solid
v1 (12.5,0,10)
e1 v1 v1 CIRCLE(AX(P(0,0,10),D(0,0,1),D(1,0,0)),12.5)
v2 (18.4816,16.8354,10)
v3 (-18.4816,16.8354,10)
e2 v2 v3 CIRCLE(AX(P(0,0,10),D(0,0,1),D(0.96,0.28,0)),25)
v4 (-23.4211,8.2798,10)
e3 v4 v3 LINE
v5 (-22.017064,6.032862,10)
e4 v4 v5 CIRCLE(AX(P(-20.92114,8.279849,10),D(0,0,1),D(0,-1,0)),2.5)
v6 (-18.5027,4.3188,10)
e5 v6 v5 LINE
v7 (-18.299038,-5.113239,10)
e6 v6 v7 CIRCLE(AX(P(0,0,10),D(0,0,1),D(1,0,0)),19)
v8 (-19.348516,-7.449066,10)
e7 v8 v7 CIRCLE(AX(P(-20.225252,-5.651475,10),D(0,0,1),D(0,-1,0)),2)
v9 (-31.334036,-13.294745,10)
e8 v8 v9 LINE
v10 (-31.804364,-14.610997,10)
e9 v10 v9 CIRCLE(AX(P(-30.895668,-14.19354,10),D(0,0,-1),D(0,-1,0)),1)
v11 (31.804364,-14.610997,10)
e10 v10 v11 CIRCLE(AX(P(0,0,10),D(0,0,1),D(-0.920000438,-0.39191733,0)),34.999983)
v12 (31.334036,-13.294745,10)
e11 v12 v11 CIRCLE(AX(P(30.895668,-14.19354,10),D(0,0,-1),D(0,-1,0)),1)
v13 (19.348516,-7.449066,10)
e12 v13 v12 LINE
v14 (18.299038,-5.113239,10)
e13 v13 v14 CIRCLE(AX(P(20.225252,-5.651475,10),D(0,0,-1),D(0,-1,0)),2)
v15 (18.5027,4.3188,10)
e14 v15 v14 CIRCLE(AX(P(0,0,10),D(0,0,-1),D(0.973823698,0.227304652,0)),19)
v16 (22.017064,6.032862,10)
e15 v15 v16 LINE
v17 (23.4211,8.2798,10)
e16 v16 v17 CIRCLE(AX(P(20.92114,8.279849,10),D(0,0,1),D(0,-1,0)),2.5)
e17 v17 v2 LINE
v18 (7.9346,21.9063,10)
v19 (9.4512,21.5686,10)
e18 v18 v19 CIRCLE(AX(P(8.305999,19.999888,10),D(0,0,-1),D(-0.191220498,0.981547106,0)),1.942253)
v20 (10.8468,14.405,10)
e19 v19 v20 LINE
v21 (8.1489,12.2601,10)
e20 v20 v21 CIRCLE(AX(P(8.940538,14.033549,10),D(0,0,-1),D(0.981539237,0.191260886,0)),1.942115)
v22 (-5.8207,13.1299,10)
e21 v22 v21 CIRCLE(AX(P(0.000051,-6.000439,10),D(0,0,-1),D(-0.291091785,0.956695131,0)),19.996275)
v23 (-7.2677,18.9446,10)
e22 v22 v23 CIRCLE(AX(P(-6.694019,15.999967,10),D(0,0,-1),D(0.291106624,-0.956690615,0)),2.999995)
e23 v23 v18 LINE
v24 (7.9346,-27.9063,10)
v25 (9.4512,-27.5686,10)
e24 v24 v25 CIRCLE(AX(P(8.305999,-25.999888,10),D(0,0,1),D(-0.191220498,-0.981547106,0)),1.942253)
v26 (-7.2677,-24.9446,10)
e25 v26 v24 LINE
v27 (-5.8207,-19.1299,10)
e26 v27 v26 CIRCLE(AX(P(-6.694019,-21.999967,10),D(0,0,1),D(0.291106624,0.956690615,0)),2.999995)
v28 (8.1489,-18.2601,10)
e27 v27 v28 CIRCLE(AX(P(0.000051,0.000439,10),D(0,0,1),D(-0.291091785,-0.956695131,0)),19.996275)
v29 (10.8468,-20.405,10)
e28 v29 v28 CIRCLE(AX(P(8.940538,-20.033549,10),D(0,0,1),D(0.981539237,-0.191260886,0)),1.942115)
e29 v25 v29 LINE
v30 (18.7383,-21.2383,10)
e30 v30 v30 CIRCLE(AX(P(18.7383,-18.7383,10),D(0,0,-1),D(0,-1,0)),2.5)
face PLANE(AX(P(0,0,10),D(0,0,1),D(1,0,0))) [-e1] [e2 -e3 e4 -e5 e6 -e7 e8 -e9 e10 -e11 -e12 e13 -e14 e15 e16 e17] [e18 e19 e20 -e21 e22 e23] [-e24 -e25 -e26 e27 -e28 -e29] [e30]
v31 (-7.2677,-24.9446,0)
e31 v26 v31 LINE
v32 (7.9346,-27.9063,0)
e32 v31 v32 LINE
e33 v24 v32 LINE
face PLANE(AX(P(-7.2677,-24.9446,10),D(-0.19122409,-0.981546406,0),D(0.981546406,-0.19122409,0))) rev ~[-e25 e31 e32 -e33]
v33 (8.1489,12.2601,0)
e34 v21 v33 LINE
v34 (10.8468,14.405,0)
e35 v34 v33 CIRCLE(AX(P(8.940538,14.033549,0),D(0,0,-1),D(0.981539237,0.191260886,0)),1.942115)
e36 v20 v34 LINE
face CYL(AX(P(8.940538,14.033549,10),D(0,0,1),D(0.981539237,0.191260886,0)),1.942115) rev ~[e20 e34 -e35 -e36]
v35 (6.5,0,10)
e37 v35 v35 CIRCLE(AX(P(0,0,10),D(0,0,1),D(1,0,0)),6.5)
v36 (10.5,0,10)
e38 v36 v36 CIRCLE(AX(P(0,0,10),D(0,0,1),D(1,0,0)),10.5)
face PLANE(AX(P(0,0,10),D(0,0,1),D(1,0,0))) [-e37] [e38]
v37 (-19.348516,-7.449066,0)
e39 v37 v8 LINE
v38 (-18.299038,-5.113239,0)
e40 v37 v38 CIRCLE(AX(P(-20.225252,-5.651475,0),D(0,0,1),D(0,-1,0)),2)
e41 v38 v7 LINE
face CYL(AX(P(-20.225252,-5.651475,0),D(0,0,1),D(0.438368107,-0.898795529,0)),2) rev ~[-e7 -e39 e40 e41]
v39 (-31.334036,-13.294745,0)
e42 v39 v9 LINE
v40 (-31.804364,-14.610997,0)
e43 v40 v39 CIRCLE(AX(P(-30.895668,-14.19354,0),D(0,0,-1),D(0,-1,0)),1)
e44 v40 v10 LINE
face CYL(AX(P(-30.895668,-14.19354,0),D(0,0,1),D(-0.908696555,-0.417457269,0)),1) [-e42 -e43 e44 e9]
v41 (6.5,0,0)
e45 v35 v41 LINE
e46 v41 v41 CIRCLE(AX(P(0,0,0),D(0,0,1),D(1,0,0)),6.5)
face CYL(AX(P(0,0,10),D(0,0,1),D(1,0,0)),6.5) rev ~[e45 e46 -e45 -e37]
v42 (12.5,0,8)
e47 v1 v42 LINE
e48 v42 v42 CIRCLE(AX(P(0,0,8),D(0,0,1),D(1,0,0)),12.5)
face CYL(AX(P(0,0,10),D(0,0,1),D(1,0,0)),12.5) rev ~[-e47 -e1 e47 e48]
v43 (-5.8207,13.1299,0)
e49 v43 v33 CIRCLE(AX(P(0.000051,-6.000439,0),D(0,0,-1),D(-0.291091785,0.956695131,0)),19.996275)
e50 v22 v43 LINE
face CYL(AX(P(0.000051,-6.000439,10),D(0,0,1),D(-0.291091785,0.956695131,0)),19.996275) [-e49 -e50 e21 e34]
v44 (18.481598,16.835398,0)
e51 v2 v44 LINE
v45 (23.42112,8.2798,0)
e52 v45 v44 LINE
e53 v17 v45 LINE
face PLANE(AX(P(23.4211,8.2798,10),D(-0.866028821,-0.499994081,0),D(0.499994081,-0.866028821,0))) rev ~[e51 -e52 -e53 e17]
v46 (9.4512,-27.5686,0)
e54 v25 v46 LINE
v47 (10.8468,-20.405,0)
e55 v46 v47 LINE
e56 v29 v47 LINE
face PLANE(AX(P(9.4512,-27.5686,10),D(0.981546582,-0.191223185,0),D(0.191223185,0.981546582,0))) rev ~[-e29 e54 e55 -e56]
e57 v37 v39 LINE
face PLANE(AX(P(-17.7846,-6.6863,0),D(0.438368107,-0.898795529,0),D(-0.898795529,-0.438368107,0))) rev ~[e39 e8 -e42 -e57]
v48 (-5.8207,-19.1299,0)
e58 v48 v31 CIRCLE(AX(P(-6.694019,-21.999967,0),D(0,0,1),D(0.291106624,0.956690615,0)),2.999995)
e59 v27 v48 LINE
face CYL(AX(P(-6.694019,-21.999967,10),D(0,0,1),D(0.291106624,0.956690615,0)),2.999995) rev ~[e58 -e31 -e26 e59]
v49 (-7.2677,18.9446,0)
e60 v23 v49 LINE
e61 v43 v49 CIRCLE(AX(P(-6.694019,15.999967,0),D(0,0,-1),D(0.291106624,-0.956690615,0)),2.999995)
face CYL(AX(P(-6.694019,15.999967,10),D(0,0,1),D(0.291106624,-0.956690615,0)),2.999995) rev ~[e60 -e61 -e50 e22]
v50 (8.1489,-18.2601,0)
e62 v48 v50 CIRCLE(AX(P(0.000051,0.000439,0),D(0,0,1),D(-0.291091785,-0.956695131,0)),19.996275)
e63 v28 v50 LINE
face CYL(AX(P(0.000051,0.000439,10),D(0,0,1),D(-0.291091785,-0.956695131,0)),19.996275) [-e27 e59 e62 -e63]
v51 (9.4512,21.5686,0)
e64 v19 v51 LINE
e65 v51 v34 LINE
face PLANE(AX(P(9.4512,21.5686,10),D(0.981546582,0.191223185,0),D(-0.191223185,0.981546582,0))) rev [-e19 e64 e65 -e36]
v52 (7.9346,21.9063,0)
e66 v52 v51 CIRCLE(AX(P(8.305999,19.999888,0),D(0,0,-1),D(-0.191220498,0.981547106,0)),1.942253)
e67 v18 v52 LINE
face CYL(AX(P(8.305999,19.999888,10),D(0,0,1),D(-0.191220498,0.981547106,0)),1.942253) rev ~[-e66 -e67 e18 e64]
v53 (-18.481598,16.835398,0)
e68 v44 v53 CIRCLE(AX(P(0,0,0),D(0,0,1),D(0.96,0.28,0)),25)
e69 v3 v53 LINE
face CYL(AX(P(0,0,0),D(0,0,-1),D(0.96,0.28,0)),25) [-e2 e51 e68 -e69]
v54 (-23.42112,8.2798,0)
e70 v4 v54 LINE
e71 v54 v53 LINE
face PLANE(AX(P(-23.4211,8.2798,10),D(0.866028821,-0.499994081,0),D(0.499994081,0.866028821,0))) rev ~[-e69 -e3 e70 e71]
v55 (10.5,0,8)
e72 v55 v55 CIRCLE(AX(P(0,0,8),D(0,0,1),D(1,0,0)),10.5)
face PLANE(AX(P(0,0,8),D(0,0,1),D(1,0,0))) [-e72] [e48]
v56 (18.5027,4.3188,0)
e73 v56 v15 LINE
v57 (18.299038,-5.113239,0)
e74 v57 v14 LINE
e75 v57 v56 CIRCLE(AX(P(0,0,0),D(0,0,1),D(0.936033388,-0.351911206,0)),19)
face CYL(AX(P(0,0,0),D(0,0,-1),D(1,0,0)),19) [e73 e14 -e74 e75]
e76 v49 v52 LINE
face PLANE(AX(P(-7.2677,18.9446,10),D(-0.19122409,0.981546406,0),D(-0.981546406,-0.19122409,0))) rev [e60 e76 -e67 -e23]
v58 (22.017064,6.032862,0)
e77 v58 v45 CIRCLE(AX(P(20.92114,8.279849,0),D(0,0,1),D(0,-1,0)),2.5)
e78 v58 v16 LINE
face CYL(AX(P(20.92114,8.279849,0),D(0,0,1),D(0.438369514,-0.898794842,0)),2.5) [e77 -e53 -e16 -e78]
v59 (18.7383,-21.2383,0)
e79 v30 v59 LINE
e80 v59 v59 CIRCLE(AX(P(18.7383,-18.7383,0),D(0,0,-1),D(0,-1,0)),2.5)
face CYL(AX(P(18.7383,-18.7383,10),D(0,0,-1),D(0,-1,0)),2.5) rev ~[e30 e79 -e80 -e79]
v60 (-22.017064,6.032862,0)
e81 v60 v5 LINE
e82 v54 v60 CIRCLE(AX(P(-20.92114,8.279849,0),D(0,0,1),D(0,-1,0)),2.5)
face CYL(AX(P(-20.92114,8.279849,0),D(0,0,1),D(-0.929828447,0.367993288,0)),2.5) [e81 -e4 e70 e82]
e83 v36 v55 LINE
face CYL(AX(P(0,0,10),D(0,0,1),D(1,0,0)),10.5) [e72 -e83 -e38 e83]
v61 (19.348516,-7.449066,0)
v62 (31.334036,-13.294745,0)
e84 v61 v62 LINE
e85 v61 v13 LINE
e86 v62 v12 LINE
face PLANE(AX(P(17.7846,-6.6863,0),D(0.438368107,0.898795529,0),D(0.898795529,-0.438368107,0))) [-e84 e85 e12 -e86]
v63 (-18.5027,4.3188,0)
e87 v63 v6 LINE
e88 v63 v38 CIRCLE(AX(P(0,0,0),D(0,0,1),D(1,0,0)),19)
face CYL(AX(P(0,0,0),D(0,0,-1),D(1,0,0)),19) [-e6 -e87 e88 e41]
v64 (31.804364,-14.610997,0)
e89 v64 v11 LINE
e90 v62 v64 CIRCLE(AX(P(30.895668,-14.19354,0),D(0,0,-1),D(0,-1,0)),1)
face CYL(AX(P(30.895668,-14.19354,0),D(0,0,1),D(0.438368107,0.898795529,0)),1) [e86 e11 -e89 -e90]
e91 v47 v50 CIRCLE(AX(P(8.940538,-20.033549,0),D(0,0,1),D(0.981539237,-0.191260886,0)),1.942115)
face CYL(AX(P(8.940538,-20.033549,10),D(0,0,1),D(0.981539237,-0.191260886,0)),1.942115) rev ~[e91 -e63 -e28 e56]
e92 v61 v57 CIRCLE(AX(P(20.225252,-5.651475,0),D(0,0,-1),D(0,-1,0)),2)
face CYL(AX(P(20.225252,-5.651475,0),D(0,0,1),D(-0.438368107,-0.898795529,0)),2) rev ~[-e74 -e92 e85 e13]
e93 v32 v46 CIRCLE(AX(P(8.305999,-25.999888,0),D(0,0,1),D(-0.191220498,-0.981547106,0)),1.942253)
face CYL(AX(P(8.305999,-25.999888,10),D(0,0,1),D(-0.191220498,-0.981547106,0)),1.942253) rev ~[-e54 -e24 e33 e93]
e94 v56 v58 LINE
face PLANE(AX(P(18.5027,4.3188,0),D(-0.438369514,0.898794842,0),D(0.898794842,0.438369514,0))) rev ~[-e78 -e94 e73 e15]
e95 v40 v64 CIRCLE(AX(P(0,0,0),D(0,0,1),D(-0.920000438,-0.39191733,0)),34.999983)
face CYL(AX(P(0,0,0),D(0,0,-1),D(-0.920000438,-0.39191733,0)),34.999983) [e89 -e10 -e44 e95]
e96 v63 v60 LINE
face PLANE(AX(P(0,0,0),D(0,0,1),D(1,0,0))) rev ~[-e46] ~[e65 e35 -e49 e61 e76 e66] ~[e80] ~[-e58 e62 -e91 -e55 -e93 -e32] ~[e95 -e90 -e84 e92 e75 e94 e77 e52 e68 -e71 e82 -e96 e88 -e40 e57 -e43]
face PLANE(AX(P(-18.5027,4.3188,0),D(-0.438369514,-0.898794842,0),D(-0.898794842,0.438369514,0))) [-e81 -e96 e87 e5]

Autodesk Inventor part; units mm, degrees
ref_plane "XY Plane" through (0, 0, 0) normal (0, 0, 1) x (1, 0, 0)
sketch "Skizze1" plane through (0, 0, 0) normal (0, 0, 1) x (1, 0, 0)
  line L0 (0, 25) -> (0, -35) construction
  line L1 (-32.2, 0) -> (32.2, 0) construction
  circle A0 centre (0, 0) radius 19
  line L2 (-18.5027, 4.3188) -> (-24, 7)
  line L3 (-17.7846, -6.6863) -> (-32.2, -13.7171)
  line L4 (18.5027, 4.3188) -> (24, 7)
  line L5 (17.7846, -6.6863) -> (32.2, -13.7171)
  arc A1 (-32.2, -13.7171) -> (32.2, -13.7171) centre (0, 0) ccw
  arc A2 (24, 7) -> (-24, 7) centre (0, 0) ccw
  dimension "d3" = 38
  dimension "d4" = 26
  dimension "d5" = 52
  dimension "d6" = 26
  dimension "d7" = 52
  dimension "d8" = 48
  dimension "d9" = 64.4
  dimension "d10" = 60
  dimension "d11" = 25
extrude "Extrusion1" add sketch "Skizze1" along normal blind 10
fillet "Rundung1" radius 2.5 2 edges at (24, 7, 5) (-24, 7, 5)
sketch "Skizze2" plane through (0, 0, 10) normal (0, 0, 1) x (1, 0, 0)
  line L0 (0, 0) -> (24.7487, -24.7487) construction
  arc A0 (-32.2, -13.7171) -> (32.2, -13.7171) centre (0, 0) ccw projected
  line L1 (0, 0) -> (35, 0) construction
  point P0 (18.7383, -18.7383)
  dimension "d15" = 45
  dimension "d16" = 26.5
hole "Bohrung1" at (18.7383, -18.7383, 10) direction (0, 0, -1) diameter 5 end through all
fillet "Rundung2" radius 1 2 edges at (32.2, -13.7171, 5) (-32.2, -13.7171, 5)
fillet "Rundung3" radius 2 2 edges at (17.7846, -6.6863, 5) (-17.7846, -6.6863, 5)
sketch "Skizze3" plane through (0, 0, 10) normal (0, 0, 1) x (1, 0, 0)
  arc A0 (-23.2457, 9.1998) -> (-22.0171, 6.0329) centre (-20.9211, 8.2798) ccw projected
  line L0 (-23.4211, 8.2798) -> (-23.4211, 29.6928) construction
  line L1 (-23.4211, 8.2798) -> (-18.4816, 16.8354)
  line L2 (-23.4211, 8.2798) -> (-11.3111, 8.2798) construction
  arc A1 (23.2457, 9.1998) -> (-23.2457, 9.1998) centre (0, 0) ccw projected
  dimension "d27" = 30
extrude "Extrusion2" cut sketch "Skizze3" against normal through all
ref_plane "Arbeitsebene1" through (0, 0, 0) normal (1, 0, 0) x (0, 1, 0)
mirror "Spiegeln1" about plane through (0, 0, 0) normal (1, 0, 0) of "Extrusion2"
sketch "Skizze4" plane through (0, 0, 10) normal (0, 0, 1) x (1, 0, 0)
  circle A0 centre (0, 0) radius 6.5
  dimension "d31" = 13
extrude "Extrusion3" cut sketch "Skizze4" against normal blind 10
sketch "Skizze5" plane through (0, 0, 10) normal (0, 0, 1) x (1, 0, 0)
  circle A0 centre (0, 0) radius 10.5
  circle A1 centre (0, 0) radius 12.5
  dimension "d34" = 21
  dimension "d35" = 25
extrude "Extrusion4" cut sketch "Skizze5" against normal blind 2
sketch "Skizze6" plane through (0, 0, 10) normal (0, 0, 1) x (1, 0, 0)
  arc A0 (-5.8207, -19.1299) -> (-7.2677, -24.9446) centre (-6.694, -22) ccw
  line L0 (-7.2677, -24.9446) -> (7.9346, -27.9063)
  arc A1 (7.9346, -27.9063) -> (9.4512, -27.5686) centre (8.306, -26) ccw
  line L1 (9.4512, -27.5686) -> (10.8468, -20.405)
  arc A2 (10.8468, -20.405) -> (8.1489, -18.2601) centre (8.9404, -20.0336) ccw
  arc A3 (-5.8207, -19.1299) -> (8.1489, -18.2601) centre (0, 0) ccw
  circle A4 centre (0, 0) radius 12.5 projected
  line L2 (0, 0) -> (0, -16.1046) construction
  dimension "d38" = 15
  dimension "d40" = 6
  dimension "d41" = 3
  dimension "d42" = 19.9959
  dimension "d43" = 22
  dimension "d44" = 26
  dimension "d45" = 20.0336
extrude "Extrusion5" cut sketch "Skizze6" against normal up to surface (10 mm away) contours A3 A2 L1 A1 L0 A0
ref_plane "Arbeitsebene2" through (0, -3, 0) normal (0, 1, 0) x (-1, 0, 0)
mirror "Spiegeln2" about plane through (0, -3, 0) normal (0, 1, 0) of "Extrusion5"
properties part number "disc" material "Stahl, galvanisiert"
